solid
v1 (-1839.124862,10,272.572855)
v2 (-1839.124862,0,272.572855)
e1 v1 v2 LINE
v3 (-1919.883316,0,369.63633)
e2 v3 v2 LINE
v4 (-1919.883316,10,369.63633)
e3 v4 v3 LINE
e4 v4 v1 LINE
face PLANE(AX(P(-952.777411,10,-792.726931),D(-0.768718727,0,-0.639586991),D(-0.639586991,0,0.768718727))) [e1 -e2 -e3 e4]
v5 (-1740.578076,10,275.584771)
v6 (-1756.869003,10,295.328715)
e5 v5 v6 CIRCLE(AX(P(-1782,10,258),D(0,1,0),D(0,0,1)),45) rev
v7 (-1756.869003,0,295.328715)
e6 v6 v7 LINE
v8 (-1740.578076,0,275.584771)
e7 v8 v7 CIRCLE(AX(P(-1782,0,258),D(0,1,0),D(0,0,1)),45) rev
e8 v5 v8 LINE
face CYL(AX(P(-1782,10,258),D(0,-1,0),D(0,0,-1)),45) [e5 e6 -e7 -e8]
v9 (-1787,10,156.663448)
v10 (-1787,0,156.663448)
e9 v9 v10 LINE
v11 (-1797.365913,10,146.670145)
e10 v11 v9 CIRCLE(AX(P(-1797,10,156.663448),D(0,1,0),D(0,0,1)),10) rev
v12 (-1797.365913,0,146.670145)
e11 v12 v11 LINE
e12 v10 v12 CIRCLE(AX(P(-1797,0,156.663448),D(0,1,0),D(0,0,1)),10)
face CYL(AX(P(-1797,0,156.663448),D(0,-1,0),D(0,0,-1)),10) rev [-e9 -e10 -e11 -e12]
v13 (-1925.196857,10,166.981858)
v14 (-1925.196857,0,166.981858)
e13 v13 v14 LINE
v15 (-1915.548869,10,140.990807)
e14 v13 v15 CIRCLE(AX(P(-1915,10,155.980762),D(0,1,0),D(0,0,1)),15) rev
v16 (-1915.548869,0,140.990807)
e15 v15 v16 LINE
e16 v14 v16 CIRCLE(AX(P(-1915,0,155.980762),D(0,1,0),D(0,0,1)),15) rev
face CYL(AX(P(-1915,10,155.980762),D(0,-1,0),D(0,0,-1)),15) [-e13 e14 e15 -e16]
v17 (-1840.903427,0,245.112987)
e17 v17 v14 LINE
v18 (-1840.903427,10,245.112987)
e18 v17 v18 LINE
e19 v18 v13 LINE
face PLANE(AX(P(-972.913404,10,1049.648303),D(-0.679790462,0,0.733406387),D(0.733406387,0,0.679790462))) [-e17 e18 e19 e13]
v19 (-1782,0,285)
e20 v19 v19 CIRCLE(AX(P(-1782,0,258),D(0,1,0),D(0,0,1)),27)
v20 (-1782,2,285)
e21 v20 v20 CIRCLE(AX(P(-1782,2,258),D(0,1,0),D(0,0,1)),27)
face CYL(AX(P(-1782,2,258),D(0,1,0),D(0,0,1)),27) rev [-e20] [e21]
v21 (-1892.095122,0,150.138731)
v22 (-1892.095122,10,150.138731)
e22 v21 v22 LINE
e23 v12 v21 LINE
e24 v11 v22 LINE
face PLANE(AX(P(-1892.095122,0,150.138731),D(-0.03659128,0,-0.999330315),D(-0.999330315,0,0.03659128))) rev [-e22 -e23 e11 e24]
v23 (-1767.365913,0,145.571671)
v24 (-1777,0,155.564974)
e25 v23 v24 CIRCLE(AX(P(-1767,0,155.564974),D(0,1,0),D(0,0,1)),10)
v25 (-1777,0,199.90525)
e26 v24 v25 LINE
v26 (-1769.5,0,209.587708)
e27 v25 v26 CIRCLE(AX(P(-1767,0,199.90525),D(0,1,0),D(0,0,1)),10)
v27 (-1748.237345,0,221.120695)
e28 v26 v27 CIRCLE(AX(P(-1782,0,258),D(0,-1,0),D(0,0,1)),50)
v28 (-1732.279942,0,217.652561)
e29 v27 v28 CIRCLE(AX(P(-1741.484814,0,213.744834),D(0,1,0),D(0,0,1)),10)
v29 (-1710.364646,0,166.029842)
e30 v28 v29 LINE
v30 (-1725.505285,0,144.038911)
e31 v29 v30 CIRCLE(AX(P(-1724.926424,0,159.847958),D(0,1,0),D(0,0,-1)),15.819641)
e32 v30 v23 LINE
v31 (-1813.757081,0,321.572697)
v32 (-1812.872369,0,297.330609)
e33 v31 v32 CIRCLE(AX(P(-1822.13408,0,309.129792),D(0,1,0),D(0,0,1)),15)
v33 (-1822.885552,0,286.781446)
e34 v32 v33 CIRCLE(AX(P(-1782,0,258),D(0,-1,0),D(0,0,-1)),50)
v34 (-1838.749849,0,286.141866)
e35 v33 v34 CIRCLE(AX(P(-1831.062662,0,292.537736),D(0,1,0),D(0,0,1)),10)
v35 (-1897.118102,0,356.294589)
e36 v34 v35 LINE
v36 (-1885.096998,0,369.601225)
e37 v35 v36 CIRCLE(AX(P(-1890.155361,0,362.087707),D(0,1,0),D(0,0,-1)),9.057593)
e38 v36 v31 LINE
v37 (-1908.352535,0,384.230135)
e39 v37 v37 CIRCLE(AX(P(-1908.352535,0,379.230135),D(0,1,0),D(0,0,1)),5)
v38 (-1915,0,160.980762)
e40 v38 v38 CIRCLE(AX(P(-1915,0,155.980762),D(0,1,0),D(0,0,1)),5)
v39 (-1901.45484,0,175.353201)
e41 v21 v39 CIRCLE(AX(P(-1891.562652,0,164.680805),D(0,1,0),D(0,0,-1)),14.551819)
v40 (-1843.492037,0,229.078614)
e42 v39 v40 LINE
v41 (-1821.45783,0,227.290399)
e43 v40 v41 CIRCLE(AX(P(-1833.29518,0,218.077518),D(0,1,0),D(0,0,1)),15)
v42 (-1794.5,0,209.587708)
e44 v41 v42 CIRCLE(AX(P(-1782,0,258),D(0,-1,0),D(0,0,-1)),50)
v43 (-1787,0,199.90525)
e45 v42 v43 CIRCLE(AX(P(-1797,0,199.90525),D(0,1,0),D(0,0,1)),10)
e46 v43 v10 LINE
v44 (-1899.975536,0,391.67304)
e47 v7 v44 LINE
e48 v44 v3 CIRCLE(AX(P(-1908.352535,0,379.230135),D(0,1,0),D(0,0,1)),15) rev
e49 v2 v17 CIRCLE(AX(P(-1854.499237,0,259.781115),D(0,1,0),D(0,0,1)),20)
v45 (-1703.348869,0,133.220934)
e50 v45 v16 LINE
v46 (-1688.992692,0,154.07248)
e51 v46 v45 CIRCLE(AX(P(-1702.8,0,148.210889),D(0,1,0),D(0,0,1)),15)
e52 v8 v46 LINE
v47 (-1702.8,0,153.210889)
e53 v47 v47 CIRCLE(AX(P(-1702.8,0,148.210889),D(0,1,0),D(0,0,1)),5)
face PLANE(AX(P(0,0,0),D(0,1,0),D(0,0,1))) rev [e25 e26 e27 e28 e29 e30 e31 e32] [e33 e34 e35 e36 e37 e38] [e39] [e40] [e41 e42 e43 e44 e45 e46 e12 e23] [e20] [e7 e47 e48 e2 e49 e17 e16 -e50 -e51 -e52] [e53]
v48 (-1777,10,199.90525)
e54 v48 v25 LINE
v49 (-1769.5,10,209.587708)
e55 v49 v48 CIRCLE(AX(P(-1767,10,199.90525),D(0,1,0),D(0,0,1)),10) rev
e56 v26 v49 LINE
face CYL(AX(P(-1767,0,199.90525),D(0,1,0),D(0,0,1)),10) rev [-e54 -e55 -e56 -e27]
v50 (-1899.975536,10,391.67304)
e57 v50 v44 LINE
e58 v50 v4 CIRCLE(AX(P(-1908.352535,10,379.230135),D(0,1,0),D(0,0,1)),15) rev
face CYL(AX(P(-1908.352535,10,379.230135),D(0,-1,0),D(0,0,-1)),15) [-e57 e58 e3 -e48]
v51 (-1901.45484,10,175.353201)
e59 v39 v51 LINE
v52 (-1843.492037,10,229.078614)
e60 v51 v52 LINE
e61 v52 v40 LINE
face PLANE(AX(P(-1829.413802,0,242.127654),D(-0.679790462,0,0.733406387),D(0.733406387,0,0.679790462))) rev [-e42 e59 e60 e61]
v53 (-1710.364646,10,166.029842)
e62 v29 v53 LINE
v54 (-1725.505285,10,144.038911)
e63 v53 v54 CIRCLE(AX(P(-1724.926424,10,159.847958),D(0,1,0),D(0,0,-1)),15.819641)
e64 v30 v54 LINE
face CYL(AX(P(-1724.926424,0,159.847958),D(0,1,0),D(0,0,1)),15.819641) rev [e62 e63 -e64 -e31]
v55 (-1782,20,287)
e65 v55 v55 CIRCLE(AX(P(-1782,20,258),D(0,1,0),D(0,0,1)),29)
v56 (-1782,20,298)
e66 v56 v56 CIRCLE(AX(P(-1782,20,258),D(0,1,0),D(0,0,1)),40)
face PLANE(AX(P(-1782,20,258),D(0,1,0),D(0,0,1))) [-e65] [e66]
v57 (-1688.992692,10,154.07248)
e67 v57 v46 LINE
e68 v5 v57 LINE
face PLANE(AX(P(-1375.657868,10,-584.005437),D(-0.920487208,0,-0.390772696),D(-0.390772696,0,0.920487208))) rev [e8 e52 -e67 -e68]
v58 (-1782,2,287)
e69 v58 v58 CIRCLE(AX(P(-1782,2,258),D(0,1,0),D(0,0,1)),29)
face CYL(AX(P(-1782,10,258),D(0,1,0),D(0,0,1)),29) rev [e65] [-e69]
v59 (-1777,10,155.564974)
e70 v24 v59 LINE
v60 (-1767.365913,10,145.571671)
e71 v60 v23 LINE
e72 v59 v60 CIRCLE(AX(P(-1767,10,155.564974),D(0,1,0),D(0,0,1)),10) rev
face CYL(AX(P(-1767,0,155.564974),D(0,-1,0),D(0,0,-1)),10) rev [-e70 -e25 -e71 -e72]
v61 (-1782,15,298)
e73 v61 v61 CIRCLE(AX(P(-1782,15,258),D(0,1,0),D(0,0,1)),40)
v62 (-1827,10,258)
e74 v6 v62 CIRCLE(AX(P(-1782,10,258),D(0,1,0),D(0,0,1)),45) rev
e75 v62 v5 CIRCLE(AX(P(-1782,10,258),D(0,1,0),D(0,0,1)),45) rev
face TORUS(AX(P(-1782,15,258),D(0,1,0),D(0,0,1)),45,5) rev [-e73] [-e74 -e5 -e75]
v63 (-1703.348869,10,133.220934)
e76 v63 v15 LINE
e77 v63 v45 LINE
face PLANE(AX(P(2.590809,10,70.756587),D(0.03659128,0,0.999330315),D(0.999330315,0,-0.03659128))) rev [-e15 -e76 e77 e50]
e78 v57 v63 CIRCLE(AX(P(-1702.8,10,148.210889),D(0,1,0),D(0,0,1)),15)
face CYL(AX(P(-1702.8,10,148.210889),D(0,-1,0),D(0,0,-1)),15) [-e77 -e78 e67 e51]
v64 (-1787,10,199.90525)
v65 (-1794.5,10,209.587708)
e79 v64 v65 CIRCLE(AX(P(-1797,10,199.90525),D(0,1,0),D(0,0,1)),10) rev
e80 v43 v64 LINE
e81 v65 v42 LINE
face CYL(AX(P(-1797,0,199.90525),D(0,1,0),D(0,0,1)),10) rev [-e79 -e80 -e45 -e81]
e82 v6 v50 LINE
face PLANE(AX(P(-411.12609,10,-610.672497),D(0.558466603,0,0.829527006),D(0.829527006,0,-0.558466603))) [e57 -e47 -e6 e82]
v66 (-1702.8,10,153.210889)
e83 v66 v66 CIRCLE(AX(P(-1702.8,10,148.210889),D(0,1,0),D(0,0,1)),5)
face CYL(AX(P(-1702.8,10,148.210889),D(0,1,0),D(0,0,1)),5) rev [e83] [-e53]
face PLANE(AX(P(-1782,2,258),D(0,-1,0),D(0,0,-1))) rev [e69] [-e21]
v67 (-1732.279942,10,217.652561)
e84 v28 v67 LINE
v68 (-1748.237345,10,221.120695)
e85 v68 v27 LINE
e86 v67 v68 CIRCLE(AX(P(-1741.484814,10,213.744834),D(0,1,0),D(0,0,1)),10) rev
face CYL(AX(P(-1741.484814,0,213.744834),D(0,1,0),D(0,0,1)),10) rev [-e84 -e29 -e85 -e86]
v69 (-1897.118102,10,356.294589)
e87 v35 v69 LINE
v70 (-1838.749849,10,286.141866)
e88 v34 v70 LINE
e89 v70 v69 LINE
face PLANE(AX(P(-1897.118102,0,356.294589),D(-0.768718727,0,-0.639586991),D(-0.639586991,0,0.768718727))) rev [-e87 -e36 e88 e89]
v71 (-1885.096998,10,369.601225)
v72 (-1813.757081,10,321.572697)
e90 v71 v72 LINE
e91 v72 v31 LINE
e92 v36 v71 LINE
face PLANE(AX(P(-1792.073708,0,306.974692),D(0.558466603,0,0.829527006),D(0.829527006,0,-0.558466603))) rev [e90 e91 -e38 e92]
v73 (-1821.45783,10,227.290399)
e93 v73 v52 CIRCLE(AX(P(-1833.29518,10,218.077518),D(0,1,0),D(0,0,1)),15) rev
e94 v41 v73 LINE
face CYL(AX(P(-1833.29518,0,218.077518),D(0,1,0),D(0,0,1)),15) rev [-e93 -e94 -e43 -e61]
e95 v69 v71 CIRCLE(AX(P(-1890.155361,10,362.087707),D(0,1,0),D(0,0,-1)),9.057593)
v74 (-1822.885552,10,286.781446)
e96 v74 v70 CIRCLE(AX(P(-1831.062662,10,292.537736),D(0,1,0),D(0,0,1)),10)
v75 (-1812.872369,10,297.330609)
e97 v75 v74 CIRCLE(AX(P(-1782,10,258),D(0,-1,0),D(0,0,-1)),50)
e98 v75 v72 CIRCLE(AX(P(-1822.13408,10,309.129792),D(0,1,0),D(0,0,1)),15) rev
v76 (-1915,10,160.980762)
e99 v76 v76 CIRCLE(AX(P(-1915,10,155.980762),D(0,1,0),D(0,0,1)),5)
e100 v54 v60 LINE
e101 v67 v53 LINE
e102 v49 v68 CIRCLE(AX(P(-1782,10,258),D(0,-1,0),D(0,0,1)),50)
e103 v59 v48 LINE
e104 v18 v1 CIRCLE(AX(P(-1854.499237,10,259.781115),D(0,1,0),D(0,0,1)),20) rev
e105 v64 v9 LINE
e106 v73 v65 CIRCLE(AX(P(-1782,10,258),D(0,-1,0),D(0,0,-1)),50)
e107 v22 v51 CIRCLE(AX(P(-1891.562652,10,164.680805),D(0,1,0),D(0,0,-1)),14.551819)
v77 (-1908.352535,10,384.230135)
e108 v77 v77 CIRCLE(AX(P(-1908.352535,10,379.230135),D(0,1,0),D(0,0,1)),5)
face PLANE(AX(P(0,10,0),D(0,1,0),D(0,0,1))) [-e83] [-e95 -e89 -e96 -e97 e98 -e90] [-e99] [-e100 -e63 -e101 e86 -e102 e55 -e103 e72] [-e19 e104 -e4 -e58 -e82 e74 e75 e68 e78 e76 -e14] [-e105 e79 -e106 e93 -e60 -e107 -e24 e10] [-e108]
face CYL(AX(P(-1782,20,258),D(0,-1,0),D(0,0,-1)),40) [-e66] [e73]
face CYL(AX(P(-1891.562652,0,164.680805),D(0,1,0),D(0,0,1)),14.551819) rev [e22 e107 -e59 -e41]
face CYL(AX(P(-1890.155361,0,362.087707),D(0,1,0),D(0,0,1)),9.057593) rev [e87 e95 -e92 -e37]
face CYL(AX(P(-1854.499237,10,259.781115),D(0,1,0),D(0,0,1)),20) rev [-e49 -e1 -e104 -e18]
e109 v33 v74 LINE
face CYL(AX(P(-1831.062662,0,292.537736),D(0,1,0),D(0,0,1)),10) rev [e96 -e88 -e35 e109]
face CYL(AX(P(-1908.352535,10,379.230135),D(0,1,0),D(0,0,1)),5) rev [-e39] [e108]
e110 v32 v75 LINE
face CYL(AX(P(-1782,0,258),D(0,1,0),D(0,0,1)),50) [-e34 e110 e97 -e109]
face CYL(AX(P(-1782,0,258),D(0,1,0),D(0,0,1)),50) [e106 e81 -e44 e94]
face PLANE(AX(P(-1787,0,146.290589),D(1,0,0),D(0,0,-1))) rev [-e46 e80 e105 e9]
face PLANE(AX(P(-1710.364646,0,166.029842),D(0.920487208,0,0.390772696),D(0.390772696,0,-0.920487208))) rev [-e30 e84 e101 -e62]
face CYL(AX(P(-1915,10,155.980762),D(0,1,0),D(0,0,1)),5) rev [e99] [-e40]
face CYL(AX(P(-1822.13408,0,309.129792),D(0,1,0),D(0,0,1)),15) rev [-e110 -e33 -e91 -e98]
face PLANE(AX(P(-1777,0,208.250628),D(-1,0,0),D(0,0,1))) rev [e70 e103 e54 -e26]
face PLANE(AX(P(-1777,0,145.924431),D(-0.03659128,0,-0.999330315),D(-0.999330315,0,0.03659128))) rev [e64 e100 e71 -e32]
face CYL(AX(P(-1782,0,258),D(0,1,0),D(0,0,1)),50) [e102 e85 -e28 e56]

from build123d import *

# Parameters (mm, degrees)
DODANIE_WYCI_GNI_CIE1_DEPTH = 10
OTW_R1_D                    = 58
OTW_R1_DEPTH                = 8
OTW_R2_D                    = 54
OTW_R2_DEPTH                = 10
SZKIC8_R                    = 40
SZKIC8_R_2                  = 29
DODANIE_WYCI_GNI_CIE2_DEPTH = 10
OTW_R3_D                    = 10
OTW_R3_DEPTH                = 100
OTW_R4_D                    = 10
OTW_R4_DEPTH                = 100
OTW_R6_D                    = 10
ZAOKR_GLENIE7_R             = 5
WYTNIJ_WYCI_GNI_CIE1_DEPTH  = 1970.877508784
ZAOKR_GLENIE8_R             = 10
ZAOKR_GLENIE9_R             = 15
ZAOKR_GLENIE10_R            = 20


with BuildPart() as part:
    # Szkic1 → Dodanie-wyciągnięcie1 (new body)
    with BuildSketch(Plane(origin=(0, 0, 0), x_dir=(1, 0, 0), z_dir=(0, 1, 0))):
        with BuildLine():
            Line((-1703.3488692, -133.220934409), (-1915.5488692, -140.99080739))
            ThreePointArc((-1915.5488692, -140.99080739), (-1929.062408554, -150.760736666), (-1925.196856926, -166.981857914))
            Line((-1925.196856926, -166.981857914), (-1827, -258))
            Line((-1827, -258), (-1919.883316335, -369.636330483))
            ThreePointArc((-1919.883316335, -369.636330483), (-1919.48315677, -389.285445814), (-1899.97553639, -391.673040436))
            Line((-1899.97553639, -391.673040436), (-1756.869002877, -295.328715269))
            ThreePointArc((-1756.869002877, -295.328715269), (-1747.290078221, -286.639506457), (-1740.578075644, -275.584771329))
            Line((-1740.578075644, -275.584771329), (-1688.992691881, -154.072479575))
            ThreePointArc((-1688.992691881, -154.072479575), (-1690.445110903, -139.704614072), (-1703.3488692, -133.220934409))
        make_face()
    extrude(amount=DODANIE_WYCI_GNI_CIE1_DEPTH)

    # Otwór1
    with Locations(Plane(origin=(0, 10, 0), x_dir=(1, 0, 0), z_dir=(0, 1, 0))):
        with Locations((-1782, -258)):
            Hole(OTW_R1_D / 2, depth=OTW_R1_DEPTH)

    # Otwór2
    with Locations(Plane(origin=(0, 2, 0), x_dir=(1, 0, 0), z_dir=(0, 1, 0))):
        with Locations((-1782, -258)):
            Hole(OTW_R2_D / 2, depth=OTW_R2_DEPTH)

    # Szkic8 → Dodanie-wyciągnięcie2 (add)
    with BuildSketch(Plane(origin=(0, 10, 0), x_dir=(1, 0, 0), z_dir=(0, 1, 0))):
        with Locations(Location((-1782, -258, 0), (0, 0, 270))):
            Circle(SZKIC8_R)
        with Locations(Location((-1782, -258, 0), (0, 0, 270))):
            Circle(SZKIC8_R_2, mode=Mode.SUBTRACT)
    extrude(amount=DODANIE_WYCI_GNI_CIE2_DEPTH)

    # Otwór3
    with Locations(Plane(origin=(0, 10, 0), x_dir=(1, 0, 0), z_dir=(0, 1, 0))):
        with Locations((-1702.8, -148.210889132)):
            Hole(OTW_R3_D / 2, depth=OTW_R3_DEPTH)

    # Otwór4
    with Locations(Plane(origin=(0, 10, 0), x_dir=(1, 0, 0), z_dir=(0, 1, 0))):
        with Locations((-1915, -155.980762114)):
            Hole(OTW_R4_D / 2, depth=OTW_R4_DEPTH)

    # Otwór6 (through all)
    with Locations(Plane(origin=(0, 10, 0), x_dir=(1, 0, 0), z_dir=(0, 1, 0))):
        with Locations((-1908.352535431, -379.230135346)):
            Hole(OTW_R6_D / 2)

    # Zaokrąglenie7
    zaokr_glenie7_edges = [part.edges().sort_by_distance(p)[0] for p in [
        (-1782, 10, 218),
    ]]
    fillet(zaokr_glenie7_edges, radius=ZAOKR_GLENIE7_R - 0.0001)  # a hair under: the kernel refuses the full size

    # Szkic19 → Wytnij-wyciągnięcie1 (cut, through all)
    with BuildSketch(Plane(origin=(0, 10, 0), x_dir=(1, 0, 0), z_dir=(0, 1, 0))):
        with BuildLine():
            Line((-1892.095122082, -150.138730991), (-1787, -146.290588911))
            Line((-1787, -146.290588911), (-1787, -208.250628145))
            ThreePointArc((-1787, -208.250628145), (-1813.204404989, -218.932300947), (-1829.413802222, -242.127654275))
            Line((-1829.413802222, -242.127654275), (-1901.454839944, -175.353201277))
            ThreePointArc((-1901.454839944, -175.353201277), (-1905.2048937, -159.616746941), (-1892.095122082, -150.138730991))
        make_face()
        with BuildLine():
            Line((-1792.073707618, -306.974691575), (-1885.096997852, -369.601225125))
            ThreePointArc((-1885.096997852, -369.601225125), (-1896.876470061, -368.159501125), (-1897.118102223, -356.294588671))
            Line((-1897.118102223, -356.294588671), (-1838.74984943, -286.141865711))
            ThreePointArc((-1838.74984943, -286.141865711), (-1830.659832163, -282.545852514), (-1822.885551801, -286.781446349))
            ThreePointArc((-1822.885551801, -286.781446349), (-1809.407176402, -299.819214264), (-1792.073707618, -306.974691575))
        make_face()
        with BuildLine():
            Line((-1710.364646313, -166.029841764), (-1738.754475915, -232.90369257))
            ThreePointArc((-1738.754475915, -232.90369257), (-1754.910314787, -215.974424988), (-1777, -208.250628145))
            Line((-1777, -208.250628145), (-1777, -145.9244309))
            Line((-1777, -145.9244309), (-1725.50528476, -144.038910652))
            ThreePointArc((-1725.50528476, -144.038910652), (-1711.896429516, -150.876876456), (-1710.364646313, -166.029841764))
        make_face()
    extrude(amount=-WYTNIJ_WYCI_GNI_CIE1_DEPTH, mode=Mode.SUBTRACT)

    # Zaokrąglenie8
    zaokr_glenie8_edges = [part.edges().sort_by_distance(p)[0] for p in [
        (-1787, 5, 208.250628145),
        (-1787, 5, 146.290588911),
        (-1738.754475915, 5, 232.90369257),
        (-1777, 5, 208.250628145),
        (-1777, 5, 145.9244309),
    ]]
    fillet(zaokr_glenie8_edges, radius=ZAOKR_GLENIE8_R)

    # Zaokrąglenie9
    zaokr_glenie9_edges = [part.edges().sort_by_distance(p)[0] for p in [
        (-1829.413802222, 5, 242.127654275),
        (-1792.073707618, 5, 306.974691575),
    ]]
    fillet(zaokr_glenie9_edges, radius=ZAOKR_GLENIE9_R)

    # Zaokrąglenie10
    zaokr_glenie10_edges = [part.edges().sort_by_distance(p)[0] for p in [
        (-1827, 5, 258),
    ]]
    fillet(zaokr_glenie10_edges, radius=ZAOKR_GLENIE10_R)


solid = part.part
